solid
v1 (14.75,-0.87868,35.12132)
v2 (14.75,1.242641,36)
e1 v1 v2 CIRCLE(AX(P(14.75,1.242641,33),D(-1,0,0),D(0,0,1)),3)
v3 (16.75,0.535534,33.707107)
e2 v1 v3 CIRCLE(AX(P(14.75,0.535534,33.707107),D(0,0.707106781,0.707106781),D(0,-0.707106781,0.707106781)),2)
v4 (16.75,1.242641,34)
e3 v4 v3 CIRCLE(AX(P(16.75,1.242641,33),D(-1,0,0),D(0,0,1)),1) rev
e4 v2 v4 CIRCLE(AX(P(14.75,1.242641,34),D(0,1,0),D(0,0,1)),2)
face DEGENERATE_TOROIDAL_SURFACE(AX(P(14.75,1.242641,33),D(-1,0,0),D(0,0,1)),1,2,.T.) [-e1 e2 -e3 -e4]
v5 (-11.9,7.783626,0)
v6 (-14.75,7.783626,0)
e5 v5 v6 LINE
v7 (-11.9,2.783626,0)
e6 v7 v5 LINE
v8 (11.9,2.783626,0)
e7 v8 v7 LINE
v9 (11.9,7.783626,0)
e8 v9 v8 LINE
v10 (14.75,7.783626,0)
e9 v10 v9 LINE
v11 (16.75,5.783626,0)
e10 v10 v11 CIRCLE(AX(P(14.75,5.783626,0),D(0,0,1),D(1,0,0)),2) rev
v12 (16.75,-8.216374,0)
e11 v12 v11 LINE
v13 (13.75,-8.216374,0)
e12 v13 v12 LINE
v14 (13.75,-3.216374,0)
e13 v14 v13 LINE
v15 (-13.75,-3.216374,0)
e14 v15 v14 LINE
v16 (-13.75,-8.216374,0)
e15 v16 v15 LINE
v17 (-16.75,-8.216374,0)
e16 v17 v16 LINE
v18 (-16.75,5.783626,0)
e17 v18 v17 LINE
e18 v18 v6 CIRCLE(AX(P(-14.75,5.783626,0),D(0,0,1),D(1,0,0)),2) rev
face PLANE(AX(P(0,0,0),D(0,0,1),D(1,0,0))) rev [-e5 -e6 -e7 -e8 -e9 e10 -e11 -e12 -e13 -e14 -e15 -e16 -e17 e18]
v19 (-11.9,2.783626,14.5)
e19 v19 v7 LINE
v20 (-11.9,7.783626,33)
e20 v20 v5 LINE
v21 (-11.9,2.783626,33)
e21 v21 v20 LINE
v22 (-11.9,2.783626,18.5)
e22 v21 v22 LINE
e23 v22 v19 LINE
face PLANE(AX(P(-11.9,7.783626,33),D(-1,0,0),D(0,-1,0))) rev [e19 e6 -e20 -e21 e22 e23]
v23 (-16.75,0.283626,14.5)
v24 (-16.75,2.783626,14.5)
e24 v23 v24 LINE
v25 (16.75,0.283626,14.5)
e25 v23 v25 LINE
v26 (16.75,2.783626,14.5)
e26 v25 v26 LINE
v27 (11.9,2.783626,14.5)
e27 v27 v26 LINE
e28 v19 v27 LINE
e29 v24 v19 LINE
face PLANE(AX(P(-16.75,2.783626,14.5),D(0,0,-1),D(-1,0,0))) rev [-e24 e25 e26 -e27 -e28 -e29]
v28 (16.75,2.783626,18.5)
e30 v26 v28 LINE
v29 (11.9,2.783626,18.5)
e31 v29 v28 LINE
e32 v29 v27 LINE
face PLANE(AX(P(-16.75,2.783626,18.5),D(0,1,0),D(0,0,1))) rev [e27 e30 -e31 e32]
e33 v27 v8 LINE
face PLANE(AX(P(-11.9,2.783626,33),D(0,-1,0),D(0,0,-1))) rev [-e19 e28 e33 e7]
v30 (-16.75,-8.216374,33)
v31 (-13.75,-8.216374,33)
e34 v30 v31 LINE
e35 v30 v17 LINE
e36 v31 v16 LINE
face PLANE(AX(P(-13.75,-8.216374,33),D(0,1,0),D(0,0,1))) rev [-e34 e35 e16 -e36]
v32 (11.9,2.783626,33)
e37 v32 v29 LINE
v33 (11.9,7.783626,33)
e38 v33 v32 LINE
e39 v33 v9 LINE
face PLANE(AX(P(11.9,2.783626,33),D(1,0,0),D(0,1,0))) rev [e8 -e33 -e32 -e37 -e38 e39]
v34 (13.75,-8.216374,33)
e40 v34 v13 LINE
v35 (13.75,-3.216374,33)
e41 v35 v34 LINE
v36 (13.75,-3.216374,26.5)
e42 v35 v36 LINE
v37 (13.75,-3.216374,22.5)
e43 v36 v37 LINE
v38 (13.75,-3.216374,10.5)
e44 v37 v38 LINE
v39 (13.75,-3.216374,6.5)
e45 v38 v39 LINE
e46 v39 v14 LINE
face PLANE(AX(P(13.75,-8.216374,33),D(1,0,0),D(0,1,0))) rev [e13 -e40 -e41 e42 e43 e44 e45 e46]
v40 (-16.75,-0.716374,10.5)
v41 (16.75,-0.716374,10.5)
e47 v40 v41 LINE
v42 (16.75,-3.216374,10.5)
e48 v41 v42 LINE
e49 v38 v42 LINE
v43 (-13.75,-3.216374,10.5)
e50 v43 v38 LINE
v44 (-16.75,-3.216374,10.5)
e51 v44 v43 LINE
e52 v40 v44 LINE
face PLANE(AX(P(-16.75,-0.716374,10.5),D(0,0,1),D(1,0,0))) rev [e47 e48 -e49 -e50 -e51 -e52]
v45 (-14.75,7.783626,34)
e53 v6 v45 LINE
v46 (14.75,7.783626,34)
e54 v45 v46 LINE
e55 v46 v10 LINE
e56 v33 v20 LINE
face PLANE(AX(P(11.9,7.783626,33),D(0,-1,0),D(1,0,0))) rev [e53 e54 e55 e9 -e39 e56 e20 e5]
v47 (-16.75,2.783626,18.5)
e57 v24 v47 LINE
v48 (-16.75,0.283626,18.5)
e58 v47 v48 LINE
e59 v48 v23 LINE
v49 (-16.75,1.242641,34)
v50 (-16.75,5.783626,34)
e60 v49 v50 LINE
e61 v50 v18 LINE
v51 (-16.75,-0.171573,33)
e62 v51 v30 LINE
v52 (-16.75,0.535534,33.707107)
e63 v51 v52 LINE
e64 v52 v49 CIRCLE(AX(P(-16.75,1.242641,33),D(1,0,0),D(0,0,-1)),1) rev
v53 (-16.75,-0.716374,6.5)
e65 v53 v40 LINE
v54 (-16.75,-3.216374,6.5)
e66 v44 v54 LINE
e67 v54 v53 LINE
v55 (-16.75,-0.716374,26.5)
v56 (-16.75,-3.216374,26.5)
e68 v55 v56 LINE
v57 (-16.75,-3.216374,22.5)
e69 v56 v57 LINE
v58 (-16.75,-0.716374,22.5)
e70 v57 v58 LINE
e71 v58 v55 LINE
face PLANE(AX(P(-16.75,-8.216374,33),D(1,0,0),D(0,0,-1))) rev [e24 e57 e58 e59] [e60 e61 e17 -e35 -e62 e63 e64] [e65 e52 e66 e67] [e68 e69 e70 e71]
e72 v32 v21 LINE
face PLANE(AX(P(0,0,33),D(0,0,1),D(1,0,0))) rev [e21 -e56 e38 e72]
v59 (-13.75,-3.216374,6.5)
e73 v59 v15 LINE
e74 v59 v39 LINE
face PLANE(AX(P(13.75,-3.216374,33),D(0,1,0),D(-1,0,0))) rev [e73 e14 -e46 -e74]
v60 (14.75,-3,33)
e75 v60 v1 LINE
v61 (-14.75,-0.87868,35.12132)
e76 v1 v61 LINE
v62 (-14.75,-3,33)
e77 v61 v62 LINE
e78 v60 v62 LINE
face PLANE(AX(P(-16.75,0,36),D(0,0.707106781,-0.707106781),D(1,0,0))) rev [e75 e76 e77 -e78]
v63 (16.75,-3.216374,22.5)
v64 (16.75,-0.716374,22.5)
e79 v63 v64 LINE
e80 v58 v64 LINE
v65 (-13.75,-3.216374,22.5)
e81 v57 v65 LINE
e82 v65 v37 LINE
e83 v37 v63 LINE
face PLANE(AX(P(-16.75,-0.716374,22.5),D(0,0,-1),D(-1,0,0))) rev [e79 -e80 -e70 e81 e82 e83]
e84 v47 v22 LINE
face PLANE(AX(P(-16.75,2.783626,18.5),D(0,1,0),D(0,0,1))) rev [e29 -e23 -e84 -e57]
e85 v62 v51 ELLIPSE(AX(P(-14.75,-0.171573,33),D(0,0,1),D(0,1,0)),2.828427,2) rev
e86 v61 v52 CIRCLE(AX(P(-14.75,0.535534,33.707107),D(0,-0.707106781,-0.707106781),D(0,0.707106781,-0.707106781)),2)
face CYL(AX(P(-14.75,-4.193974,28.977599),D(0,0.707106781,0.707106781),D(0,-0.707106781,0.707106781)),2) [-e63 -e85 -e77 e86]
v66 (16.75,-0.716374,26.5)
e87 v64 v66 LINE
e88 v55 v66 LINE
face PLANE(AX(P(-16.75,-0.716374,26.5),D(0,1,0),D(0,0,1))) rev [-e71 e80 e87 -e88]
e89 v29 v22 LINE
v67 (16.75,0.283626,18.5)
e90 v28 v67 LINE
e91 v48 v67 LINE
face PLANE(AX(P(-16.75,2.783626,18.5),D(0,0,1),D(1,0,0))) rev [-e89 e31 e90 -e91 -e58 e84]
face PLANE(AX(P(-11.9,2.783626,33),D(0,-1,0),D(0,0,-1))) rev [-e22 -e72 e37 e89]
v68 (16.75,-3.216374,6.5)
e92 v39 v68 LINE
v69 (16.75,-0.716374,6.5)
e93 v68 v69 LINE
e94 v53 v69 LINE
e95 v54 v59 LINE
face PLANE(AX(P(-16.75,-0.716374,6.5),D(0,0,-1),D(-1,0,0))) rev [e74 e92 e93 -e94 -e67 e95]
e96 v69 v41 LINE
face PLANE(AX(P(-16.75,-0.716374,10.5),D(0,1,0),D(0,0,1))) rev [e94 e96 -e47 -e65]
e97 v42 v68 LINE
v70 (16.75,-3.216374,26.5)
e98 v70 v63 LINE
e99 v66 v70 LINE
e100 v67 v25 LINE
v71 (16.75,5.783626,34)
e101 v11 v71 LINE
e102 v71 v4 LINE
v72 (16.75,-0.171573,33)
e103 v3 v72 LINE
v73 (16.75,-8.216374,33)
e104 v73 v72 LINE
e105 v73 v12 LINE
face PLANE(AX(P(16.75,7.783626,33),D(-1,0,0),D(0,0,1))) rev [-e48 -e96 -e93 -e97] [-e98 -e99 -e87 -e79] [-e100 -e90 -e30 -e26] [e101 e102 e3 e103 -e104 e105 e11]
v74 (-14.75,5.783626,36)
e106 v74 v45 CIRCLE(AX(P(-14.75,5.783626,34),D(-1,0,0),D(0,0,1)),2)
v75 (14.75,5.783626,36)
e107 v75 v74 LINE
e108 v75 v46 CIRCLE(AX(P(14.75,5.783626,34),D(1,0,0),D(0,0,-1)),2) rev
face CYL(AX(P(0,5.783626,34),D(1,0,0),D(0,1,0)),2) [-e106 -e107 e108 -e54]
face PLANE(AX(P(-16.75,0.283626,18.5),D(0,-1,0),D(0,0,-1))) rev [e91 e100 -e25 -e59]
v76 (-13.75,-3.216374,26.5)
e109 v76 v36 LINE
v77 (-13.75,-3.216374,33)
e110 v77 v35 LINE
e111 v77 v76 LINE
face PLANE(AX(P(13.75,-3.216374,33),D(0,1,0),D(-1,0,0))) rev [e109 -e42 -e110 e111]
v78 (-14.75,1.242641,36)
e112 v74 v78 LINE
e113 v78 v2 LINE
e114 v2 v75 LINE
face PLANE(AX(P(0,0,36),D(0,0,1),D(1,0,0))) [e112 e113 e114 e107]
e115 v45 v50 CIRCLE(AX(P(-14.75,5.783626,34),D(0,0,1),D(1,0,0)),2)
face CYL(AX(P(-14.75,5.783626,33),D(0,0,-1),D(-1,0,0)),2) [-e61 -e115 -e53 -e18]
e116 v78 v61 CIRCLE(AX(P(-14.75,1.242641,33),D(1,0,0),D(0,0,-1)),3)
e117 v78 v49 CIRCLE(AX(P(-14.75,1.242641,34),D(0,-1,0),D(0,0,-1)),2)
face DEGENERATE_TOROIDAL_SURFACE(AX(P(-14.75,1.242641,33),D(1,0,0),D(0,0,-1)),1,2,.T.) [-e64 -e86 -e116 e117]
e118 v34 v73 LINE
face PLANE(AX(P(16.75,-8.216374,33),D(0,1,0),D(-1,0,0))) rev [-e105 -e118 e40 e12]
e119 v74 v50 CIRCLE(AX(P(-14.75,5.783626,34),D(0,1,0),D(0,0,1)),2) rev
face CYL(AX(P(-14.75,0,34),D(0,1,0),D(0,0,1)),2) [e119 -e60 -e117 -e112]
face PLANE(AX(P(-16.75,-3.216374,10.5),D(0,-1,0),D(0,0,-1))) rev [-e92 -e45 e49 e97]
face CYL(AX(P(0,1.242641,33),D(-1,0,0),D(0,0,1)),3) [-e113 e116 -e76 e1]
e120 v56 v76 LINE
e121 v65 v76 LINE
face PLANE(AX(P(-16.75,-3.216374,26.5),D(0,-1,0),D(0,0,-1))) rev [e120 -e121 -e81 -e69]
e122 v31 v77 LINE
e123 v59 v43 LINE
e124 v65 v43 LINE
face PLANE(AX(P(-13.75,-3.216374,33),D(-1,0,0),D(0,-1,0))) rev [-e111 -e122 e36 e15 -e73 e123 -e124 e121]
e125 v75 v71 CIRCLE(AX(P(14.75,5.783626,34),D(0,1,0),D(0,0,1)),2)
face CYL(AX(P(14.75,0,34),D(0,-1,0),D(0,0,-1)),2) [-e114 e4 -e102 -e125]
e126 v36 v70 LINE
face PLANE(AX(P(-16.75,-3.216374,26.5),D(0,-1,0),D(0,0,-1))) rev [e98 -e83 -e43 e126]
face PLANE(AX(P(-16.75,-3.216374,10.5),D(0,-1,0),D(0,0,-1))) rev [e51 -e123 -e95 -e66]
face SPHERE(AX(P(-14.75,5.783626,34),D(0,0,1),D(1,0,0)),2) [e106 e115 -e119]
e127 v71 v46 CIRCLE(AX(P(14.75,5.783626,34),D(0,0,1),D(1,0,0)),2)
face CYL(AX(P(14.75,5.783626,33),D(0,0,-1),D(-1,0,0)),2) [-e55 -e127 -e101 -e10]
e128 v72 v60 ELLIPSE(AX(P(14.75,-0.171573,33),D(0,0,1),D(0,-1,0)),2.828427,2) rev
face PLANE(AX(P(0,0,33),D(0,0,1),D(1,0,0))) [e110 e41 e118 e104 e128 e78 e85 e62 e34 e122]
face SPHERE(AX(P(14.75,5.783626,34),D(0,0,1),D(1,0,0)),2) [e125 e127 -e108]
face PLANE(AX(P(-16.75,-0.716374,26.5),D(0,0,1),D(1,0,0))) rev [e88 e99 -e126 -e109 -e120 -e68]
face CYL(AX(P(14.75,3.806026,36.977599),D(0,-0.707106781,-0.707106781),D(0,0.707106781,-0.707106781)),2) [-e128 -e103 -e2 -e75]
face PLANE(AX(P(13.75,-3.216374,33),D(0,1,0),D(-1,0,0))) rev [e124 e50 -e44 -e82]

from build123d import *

# Parameters (mm, degrees)
BOSS_EXTRU_1_DEPTH      = 33
ESQUISSE2_W             = 4
ESQUISSE2_H             = 2.5
ENL_V_MAT_EXTRU_1_DEPTH = 48.736346803
ESQUISSE3_W             = 4
ESQUISSE3_H             = 2.5
ENL_V_MAT_EXTRU_2_DEPTH = 48.736346803
ESQUISSE4_W             = 33.5
ESQUISSE4_H             = 7.783625731
BOSS_EXTRU_2_DEPTH      = 3
CHANFREIN1_SIZE         = 3
CONG_3_START            = -18
CONG_3_DEPTH            = 36
CONG_2_R                = 2


with BuildPart() as part:
    # Esquisse1 → Boss.-Extru.1 (new body)
    with BuildSketch(Plane.XY):
        Polygon((-11.9, 2.783625731), (11.9, 2.783625731), (11.9, 7.783625731), (16.75, 7.783625731), (16.75, -8.216374269), (13.75, -8.216374269), (13.75, -3.216374269), (-13.75, -3.216374269), (-13.75, -8.216374269), (-16.75, -8.216374269), (-16.75, 7.783625731), (-11.9, 7.783625731), align=None)
    extrude(amount=BOSS_EXTRU_1_DEPTH)

    # Esquisse2 → Enlèv. mat.-Extru.1 (cut, through all)
    with BuildSketch(Plane(origin=(16.75, 0, 0), x_dir=(0, 0, -1), z_dir=(1, 0, 0))):
        with Locations((-24.5, -1.966374269)):
            Rectangle(ESQUISSE2_W, ESQUISSE2_H)
        with Locations((-8.5, -1.966374269)):
            Rectangle(ESQUISSE2_W, ESQUISSE2_H)
    extrude(amount=-ENL_V_MAT_EXTRU_1_DEPTH, mode=Mode.SUBTRACT)

    # Esquisse3 → Enlèv. mat.-Extru.2 (cut, through all)
    with BuildSketch(Plane(origin=(16.75, 0, 0), x_dir=(0, 0, -1), z_dir=(1, 0, 0))):
        with Locations((-16.5, 1.533625731)):
            Rectangle(ESQUISSE3_W, ESQUISSE3_H)
    extrude(amount=-ENL_V_MAT_EXTRU_2_DEPTH, mode=Mode.SUBTRACT)

    # Esquisse4 → Boss.-Extru.2 (add)
    with BuildSketch(Plane.XY.offset(33)):
        with Locations((0, 3.891812866)):
            Rectangle(ESQUISSE4_W, ESQUISSE4_H)
    extrude(amount=BOSS_EXTRU_2_DEPTH)

    # Chanfrein1
    chanfrein1_edges = [part.edges().sort_by_distance(p)[0] for p in [
        (0, 0, 33),
    ]]
    chamfer(chanfrein1_edges, length=CHANFREIN1_SIZE - 0.0001)  # a hair under: the kernel refuses the full size

    # Congé3: read off the stored shape, not the designer's step
    # Congé3 outline → Congé3 (cut)
    with BuildSketch(Plane.YZ.offset(CONG_3_START)):
        with BuildLine():
            Line((0, 36), (-0.878679656, 35.121320344))
            ThreePointArc((-0.878679656, 35.121320344), (0.09459039, 35.771638598), (1.242640687, 36))
            Line((1.242640687, 36), (0, 36))
        make_face()
    extrude(amount=CONG_3_DEPTH, mode=Mode.SUBTRACT)

    # Congé2
    cong_2_edges = [part.edges().sort_by_distance(p)[0] for p in [
        (0, 7.783625731, 36),
        (-16.75, -1.931982494, 34.067917506),
        (16.75, 4.513133209, 36),
        (16.75, -1.931982494, 34.067917506),
        (16.75, 0.104112039, 35.77556346),
        (-16.75, 0.104112039, 35.77556346),
        (16.75, 7.783625731, 18),
        (-16.75, 7.783625731, 18),
        (-16.75, 4.513133209, 36),
    ]]
    fillet(cong_2_edges, radius=CONG_2_R)


solid = part.part
